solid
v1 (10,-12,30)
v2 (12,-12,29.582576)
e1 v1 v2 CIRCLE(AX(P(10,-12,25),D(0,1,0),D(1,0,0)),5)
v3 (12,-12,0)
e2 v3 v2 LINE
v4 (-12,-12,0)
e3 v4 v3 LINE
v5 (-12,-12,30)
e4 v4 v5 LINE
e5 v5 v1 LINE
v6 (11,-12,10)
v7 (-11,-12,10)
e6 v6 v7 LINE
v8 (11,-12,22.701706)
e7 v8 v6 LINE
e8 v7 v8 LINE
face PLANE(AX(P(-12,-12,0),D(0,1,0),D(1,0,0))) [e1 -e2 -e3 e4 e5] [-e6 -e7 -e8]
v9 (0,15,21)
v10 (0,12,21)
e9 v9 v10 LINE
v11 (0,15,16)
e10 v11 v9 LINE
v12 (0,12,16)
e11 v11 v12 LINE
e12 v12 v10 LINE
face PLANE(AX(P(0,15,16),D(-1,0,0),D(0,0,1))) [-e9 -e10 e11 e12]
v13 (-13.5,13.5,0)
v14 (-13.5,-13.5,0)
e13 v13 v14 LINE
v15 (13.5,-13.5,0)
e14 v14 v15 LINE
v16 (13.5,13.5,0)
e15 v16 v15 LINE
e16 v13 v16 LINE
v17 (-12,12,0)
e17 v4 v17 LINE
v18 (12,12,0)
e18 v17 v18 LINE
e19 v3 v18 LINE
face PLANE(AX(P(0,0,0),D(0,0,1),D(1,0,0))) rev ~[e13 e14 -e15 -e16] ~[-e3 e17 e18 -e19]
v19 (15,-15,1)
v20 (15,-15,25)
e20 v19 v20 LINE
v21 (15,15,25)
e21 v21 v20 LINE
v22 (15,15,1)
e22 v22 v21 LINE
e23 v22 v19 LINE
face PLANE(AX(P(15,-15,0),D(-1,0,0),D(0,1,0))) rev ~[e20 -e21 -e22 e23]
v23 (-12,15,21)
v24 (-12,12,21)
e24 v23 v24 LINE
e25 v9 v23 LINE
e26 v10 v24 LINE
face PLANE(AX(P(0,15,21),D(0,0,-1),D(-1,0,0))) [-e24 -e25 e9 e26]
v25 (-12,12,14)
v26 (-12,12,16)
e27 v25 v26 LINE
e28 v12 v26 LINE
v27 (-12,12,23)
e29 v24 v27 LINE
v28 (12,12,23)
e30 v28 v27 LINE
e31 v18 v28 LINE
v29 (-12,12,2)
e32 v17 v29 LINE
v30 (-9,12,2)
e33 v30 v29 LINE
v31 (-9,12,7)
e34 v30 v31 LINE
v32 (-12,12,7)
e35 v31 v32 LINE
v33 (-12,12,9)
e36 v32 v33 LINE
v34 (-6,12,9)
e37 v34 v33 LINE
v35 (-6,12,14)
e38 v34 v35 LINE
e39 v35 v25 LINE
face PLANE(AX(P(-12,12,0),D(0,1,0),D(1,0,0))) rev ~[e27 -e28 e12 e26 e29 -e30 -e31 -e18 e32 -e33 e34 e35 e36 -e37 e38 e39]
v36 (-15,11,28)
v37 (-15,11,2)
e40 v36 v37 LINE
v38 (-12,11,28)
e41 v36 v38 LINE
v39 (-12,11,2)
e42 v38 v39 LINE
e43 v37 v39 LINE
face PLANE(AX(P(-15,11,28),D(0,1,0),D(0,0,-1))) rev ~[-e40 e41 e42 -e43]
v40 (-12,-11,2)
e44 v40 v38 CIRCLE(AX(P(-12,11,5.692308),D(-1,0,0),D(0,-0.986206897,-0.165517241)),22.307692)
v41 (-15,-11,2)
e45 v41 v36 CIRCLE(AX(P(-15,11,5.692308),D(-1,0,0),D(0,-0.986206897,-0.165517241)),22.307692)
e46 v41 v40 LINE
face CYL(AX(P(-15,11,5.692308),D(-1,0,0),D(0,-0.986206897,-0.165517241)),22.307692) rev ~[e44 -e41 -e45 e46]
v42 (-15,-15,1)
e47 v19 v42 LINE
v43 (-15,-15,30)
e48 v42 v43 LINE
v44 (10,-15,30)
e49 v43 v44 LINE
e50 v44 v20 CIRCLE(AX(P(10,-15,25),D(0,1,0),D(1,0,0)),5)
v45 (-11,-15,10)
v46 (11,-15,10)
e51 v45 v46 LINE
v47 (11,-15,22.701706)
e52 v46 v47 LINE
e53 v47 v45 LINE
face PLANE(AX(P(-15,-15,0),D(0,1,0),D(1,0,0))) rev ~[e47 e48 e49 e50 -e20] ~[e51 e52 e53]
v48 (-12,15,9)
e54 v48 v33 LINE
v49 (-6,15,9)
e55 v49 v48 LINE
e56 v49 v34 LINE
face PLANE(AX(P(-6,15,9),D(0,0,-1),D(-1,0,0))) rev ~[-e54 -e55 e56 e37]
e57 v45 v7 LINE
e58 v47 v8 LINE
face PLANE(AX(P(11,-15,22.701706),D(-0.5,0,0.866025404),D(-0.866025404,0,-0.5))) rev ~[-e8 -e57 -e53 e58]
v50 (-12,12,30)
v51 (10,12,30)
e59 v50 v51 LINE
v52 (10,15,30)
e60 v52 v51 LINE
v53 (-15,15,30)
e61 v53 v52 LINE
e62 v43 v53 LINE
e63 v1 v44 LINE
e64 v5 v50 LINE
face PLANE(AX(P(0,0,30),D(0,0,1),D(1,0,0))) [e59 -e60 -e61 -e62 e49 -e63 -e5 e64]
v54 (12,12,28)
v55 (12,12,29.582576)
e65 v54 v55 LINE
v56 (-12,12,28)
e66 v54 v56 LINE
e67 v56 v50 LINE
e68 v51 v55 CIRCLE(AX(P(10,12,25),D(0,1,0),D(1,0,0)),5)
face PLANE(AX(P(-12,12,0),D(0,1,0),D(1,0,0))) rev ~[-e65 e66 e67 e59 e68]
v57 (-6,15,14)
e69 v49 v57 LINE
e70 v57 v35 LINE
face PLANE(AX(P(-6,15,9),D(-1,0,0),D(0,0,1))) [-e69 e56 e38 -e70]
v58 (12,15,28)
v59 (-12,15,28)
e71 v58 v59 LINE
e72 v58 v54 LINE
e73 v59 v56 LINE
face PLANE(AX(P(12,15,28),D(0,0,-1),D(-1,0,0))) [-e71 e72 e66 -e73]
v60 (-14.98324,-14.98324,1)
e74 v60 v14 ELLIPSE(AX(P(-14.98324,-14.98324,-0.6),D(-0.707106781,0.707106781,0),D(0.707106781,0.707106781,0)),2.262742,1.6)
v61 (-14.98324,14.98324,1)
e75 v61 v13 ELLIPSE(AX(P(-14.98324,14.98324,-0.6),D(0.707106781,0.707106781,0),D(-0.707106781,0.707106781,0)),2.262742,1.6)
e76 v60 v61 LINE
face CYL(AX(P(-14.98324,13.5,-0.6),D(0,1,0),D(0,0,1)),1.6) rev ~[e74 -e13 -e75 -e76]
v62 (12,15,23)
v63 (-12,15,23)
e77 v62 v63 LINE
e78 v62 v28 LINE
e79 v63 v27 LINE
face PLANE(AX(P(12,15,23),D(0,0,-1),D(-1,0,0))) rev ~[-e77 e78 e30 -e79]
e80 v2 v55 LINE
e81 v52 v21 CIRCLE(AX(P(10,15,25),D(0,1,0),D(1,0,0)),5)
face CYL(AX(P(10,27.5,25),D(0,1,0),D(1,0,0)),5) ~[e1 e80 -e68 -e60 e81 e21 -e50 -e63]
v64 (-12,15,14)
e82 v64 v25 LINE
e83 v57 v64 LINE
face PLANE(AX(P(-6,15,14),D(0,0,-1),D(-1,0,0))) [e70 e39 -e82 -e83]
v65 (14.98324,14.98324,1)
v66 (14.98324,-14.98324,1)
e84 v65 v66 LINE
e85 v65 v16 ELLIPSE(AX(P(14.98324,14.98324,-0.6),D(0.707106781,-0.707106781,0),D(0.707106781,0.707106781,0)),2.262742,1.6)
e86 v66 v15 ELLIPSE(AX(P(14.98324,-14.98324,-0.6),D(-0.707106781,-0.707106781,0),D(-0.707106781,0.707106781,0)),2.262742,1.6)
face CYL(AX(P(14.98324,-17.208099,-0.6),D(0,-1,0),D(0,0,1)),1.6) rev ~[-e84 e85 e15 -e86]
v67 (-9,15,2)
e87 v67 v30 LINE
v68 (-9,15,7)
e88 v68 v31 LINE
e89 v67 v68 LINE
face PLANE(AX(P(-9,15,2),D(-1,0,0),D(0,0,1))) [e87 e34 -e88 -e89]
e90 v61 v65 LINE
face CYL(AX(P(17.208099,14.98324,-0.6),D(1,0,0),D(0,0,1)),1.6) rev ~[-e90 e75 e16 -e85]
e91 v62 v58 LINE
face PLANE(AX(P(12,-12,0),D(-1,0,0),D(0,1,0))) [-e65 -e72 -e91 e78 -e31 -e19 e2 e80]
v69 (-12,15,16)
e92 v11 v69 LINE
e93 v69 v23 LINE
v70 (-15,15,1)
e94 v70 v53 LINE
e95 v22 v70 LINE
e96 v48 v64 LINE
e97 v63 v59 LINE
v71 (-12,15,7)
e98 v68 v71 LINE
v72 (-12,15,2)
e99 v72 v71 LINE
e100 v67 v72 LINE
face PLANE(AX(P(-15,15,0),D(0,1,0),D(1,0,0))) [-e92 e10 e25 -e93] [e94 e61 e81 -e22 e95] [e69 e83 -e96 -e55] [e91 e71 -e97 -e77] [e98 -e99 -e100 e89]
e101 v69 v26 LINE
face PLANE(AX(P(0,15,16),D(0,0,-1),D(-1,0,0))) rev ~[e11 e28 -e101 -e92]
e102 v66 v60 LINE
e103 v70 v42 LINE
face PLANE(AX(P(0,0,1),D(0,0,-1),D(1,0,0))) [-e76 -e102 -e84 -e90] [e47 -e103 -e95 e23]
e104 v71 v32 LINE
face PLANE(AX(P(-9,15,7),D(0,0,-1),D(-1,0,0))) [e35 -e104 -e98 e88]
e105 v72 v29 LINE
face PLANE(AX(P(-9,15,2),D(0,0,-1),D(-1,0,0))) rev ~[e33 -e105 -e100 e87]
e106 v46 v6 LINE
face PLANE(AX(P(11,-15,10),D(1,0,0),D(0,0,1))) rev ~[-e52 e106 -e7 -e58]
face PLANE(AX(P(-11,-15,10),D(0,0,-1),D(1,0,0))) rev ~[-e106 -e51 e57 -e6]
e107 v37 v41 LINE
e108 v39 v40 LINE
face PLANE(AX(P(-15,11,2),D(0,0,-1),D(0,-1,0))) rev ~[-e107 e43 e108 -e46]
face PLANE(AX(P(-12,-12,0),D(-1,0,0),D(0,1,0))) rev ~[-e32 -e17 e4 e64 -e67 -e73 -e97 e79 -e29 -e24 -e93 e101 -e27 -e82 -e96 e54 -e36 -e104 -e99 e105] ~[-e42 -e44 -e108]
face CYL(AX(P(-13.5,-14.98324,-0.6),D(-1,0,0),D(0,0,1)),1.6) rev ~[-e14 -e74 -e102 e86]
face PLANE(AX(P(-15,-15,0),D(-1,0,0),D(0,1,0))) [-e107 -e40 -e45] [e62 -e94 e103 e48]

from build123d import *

# Parameters (mm, degrees)
F0_W          = 30
F0_H          = 30
F0_W_2        = 24
F0_H_2        = 24
F1_DEPTH      = 30
F3_DEPTH      = 5
F5_DEPTH      = 4
F6_W          = 12
F6_H          = 5
F6_W_2        = 6
F6_W_3        = 3
F6_W_4        = 24
F7_DEPTH      = 3
F8_W          = 30.8
F8_H          = 30.8
F8_W_2        = 27
F8_H_2        = 27
F9_DEPTH      = 1
F10_T1_DEPTH  = 27
F10_T3_DEPTH  = 27
F10_T9_DEPTH  = 30.7080992435
F10_T14_DEPTH = 30.7080992435
F10_T22_DEPTH = 30.7080992435
F10_T27_DEPTH = 30.7080992435
F10_T35_DEPTH = 30.7080992435
F10_T40_DEPTH = 30.7080992435
F10_T48_DEPTH = 30.7080992435
F10_T53_DEPTH = 30.7080992435
F11_T1_DEPTH  = 55


# Not quite as in the source:
# - a fillet or chamfer that OpenCascade refuses, or shapes differently, is made with other operations: its cross-section is extruded or revolved along the edge and cut away or added


with BuildPart() as f1:
    # F0 (on Top) → F1 (new body)
    with BuildSketch(Plane.XY):
        Rectangle(F0_W, F0_H)
        Rectangle(F0_W_2, F0_H_2, mode=Mode.SUBTRACT)
    extrude(amount=F1_DEPTH)

    # F2 (on face) → F3 (cut)
    with BuildSketch(Plane.XZ.offset(15)):
        Polygon((11, 22.7017059222), (-11, 10), (11, 10), align=None)
    extrude(amount=-F3_DEPTH, mode=Mode.SUBTRACT)

    # F4 (on face) → F5 (cut)
    with BuildSketch(Plane(origin=(-15, 0, 0), x_dir=(0, -1, 0), z_dir=(-1, 0, 0))):
        with BuildLine():
            ThreePointArc((11, 2), (6.0293863659, 20.1017884635), (-11, 28))
            Line((-11, 28), (-11, 2))
            Line((-11, 2), (11, 2))
        make_face()
    extrude(amount=-F5_DEPTH, mode=Mode.SUBTRACT)

    # F6 (on face) → F7 (cut)
    with BuildSketch(Plane(origin=(0, 15, 0), x_dir=(-1, 0, 0), z_dir=(0, 1, 0))):
        with Locations((6, 18.5)):
            Rectangle(F6_W, F6_H)
        with Locations((9, 11.5)):
            Rectangle(F6_W_2, F6_H)
        with Locations((10.5, 4.5)):
            Rectangle(F6_W_3, F6_H)
        with Locations((0, 25.5)):
            Rectangle(F6_W_4, F6_H)
    extrude(amount=-F7_DEPTH, mode=Mode.SUBTRACT)

    # F8 (on face) → F9 (cut)
    with BuildSketch(Plane(origin=(0, 0, 0), x_dir=(1, 0, 0), z_dir=(0, 0, -1))):
        Rectangle(F8_W, F8_H)
        Rectangle(F8_W_2, F8_H_2, mode=Mode.SUBTRACT)
    extrude(amount=-F9_DEPTH, mode=Mode.SUBTRACT)

    # F10: fillet of radius 1.6 on 4 edges, made by hand

    # F10_s2 → F10_t1 (join)
    with BuildSketch(Plane.XZ.offset(-13.5)):
        with BuildLine():
            ThreePointArc((-14.9832396974, 1), (-14.0888125064, 0.7266499161), (-13.5, 0))
            Line((-13.5, 0), (-13.5, 1))
            Line((-13.5, 1), (-14.9832396974, 1))
        make_face()
        with BuildLine():
            ThreePointArc((14.9832396974, 1), (14.0888125064, 0.7266499161), (13.5, 0))
            Line((13.5, 0), (13.5, 1))
            Line((13.5, 1), (14.9832396974, 1))
        make_face()
    extrude(amount=F10_T1_DEPTH)

    # F10_s4 → F10_t3 (join)
    with BuildSketch(Plane.YZ.offset(-13.5)):
        with BuildLine():
            ThreePointArc((14.9832396974, 1), (14.0888125064, 0.7266499161), (13.5, 0))
            Line((13.5, 0), (13.5, 1))
            Line((13.5, 1), (14.9832396974, 1))
        make_face()
        with BuildLine():
            ThreePointArc((-14.9832396974, 1), (-14.0888125064, 0.7266499161), (-13.5, 0))
            Line((-13.5, 0), (-13.5, 1))
            Line((-13.5, 1), (-14.9832396974, 1))
        make_face()
    extrude(amount=F10_T3_DEPTH)


with BuildPart() as f10_tool7:
    # F10_s8 → F10_t9 (new body)
    with BuildSketch(Plane.XZ.offset(-17.2080992435)):
        with BuildLine():
            ThreePointArc((-14.9832396974, 1), (-14.0888125064, 0.7266499161), (-13.5, 0))
            Line((-13.5, 0), (-13.5, 1))
            Line((-13.5, 1), (-14.9832396974, 1))
        make_face()
    extrude(amount=F10_T9_DEPTH)

    split(bisect_by=Plane.XZ.offset(-15), keep=Keep.TOP)

    split(bisect_by=Plane.XZ.offset(-13.5), keep=Keep.BOTTOM)


with BuildPart() as f10_tool12:
    # F10_s13 → F10_t14 (new body)
    with BuildSketch(Plane.YZ.offset(13.5)):
        with BuildLine():
            ThreePointArc((14.9832396974, 1), (14.0888125064, 0.7266499161), (13.5, 0))
            Line((13.5, 0), (13.5, 1))
            Line((13.5, 1), (14.9832396974, 1))
        make_face()
    extrude(amount=-F10_T14_DEPTH)

    split(bisect_by=Plane.YZ.offset(-15), keep=Keep.TOP)

    split(bisect_by=Plane.YZ.offset(-13.5), keep=Keep.BOTTOM)


with BuildPart() as f10_tool7_1:
    add(f10_tool7.part)

    # F10_t17: intersect F10_tool12
    add(f10_tool12.part, mode=Mode.INTERSECT)


with BuildPart() as f1_1:
    add(f1.part)

    # F10_t5: union F10_tool7
    add(f10_tool7_1.part)


with BuildPart() as f10_tool20:
    # F10_s21 → F10_t22 (new body)
    with BuildSketch(Plane.XZ.offset(-13.5)):
        with BuildLine():
            ThreePointArc((-14.9832396974, 1), (-14.0888125064, 0.7266499161), (-13.5, 0))
            Line((-13.5, 0), (-13.5, 1))
            Line((-13.5, 1), (-14.9832396974, 1))
        make_face()
    extrude(amount=F10_T22_DEPTH)

    split(bisect_by=Plane.XZ.offset(15), keep=Keep.BOTTOM)

    split(bisect_by=Plane.XZ.offset(13.5), keep=Keep.TOP)


with BuildPart() as f10_tool25:
    # F10_s26 → F10_t27 (new body)
    with BuildSketch(Plane.YZ.offset(-17.2080992435)):
        with BuildLine():
            ThreePointArc((-14.9832396974, 1), (-14.0888125064, 0.7266499161), (-13.5, 0))
            Line((-13.5, 0), (-13.5, 1))
            Line((-13.5, 1), (-14.9832396974, 1))
        make_face()
    extrude(amount=F10_T27_DEPTH)

    split(bisect_by=Plane.YZ.offset(-15), keep=Keep.TOP)

    split(bisect_by=Plane.YZ.offset(-13.5), keep=Keep.BOTTOM)


with BuildPart() as f10_tool20_1:
    add(f10_tool20.part)

    # F10_t30: intersect F10_tool25
    add(f10_tool25.part, mode=Mode.INTERSECT)


with BuildPart() as f1_2:
    add(f1_1.part)

    # F10_t18: union F10_tool20
    add(f10_tool20_1.part)


with BuildPart() as f10_tool33:
    # F10_s34 → F10_t35 (new body)
    with BuildSketch(Plane.YZ.offset(17.2080992435)):
        with BuildLine():
            ThreePointArc((14.9832396974, 1), (14.0888125064, 0.7266499161), (13.5, 0))
            Line((13.5, 0), (13.5, 1))
            Line((13.5, 1), (14.9832396974, 1))
        make_face()
    extrude(amount=-F10_T35_DEPTH)

    split(bisect_by=Plane.YZ.offset(15), keep=Keep.BOTTOM)

    split(bisect_by=Plane.YZ.offset(13.5), keep=Keep.TOP)


with BuildPart() as f10_tool38:
    # F10_s39 → F10_t40 (new body)
    with BuildSketch(Plane.XZ.offset(13.5)):
        with BuildLine():
            ThreePointArc((14.9832396974, 1), (14.0888125064, 0.7266499161), (13.5, 0))
            Line((13.5, 0), (13.5, 1))
            Line((13.5, 1), (14.9832396974, 1))
        make_face()
    extrude(amount=-F10_T40_DEPTH)

    split(bisect_by=Plane.XZ.offset(-15), keep=Keep.TOP)

    split(bisect_by=Plane.XZ.offset(-13.5), keep=Keep.BOTTOM)


with BuildPart() as f10_tool33_1:
    add(f10_tool33.part)

    # F10_t43: intersect F10_tool38
    add(f10_tool38.part, mode=Mode.INTERSECT)


with BuildPart() as f1_3:
    add(f1_2.part)

    # F10_t31: union F10_tool33
    add(f10_tool33_1.part)


with BuildPart() as f10_tool46:
    # F10_s47 → F10_t48 (new body)
    with BuildSketch(Plane.YZ.offset(-13.5)):
        with BuildLine():
            ThreePointArc((-14.9832396974, 1), (-14.0888125064, 0.7266499161), (-13.5, 0))
            Line((-13.5, 0), (-13.5, 1))
            Line((-13.5, 1), (-14.9832396974, 1))
        make_face()
    extrude(amount=F10_T48_DEPTH)

    split(bisect_by=Plane.YZ.offset(15), keep=Keep.BOTTOM)

    split(bisect_by=Plane.YZ.offset(13.5), keep=Keep.TOP)


with BuildPart() as f10_tool51:
    # F10_s52 → F10_t53 (new body)
    with BuildSketch(Plane.XZ.offset(17.2080992435)):
        with BuildLine():
            ThreePointArc((14.9832396974, 1), (14.0888125064, 0.7266499161), (13.5, 0))
            Line((13.5, 0), (13.5, 1))
            Line((13.5, 1), (14.9832396974, 1))
        make_face()
    extrude(amount=-F10_T53_DEPTH)

    split(bisect_by=Plane.XZ.offset(15), keep=Keep.BOTTOM)

    split(bisect_by=Plane.XZ.offset(13.5), keep=Keep.TOP)


with BuildPart() as f10_tool46_1:
    add(f10_tool46.part)

    # F10_t56: intersect F10_tool51
    add(f10_tool51.part, mode=Mode.INTERSECT)


with BuildPart() as f1_4:
    add(f1_3.part)

    # F10_t44: union F10_tool46
    add(f10_tool46_1.part)

    # F11: fillet of radius 5 on 1 edges, made by hand

    # F11_s2 → F11_t1 (cut)
    with BuildSketch(Plane.XZ.offset(-27.5)):
        with BuildLine():
            ThreePointArc((15, 25), (13.5355339059, 28.5355339059), (10, 30))
            Line((10, 30), (15, 30))
            Line((15, 30), (15, 25))
        make_face()
    extrude(amount=F11_T1_DEPTH, mode=Mode.SUBTRACT)


solid = f1_4.part
